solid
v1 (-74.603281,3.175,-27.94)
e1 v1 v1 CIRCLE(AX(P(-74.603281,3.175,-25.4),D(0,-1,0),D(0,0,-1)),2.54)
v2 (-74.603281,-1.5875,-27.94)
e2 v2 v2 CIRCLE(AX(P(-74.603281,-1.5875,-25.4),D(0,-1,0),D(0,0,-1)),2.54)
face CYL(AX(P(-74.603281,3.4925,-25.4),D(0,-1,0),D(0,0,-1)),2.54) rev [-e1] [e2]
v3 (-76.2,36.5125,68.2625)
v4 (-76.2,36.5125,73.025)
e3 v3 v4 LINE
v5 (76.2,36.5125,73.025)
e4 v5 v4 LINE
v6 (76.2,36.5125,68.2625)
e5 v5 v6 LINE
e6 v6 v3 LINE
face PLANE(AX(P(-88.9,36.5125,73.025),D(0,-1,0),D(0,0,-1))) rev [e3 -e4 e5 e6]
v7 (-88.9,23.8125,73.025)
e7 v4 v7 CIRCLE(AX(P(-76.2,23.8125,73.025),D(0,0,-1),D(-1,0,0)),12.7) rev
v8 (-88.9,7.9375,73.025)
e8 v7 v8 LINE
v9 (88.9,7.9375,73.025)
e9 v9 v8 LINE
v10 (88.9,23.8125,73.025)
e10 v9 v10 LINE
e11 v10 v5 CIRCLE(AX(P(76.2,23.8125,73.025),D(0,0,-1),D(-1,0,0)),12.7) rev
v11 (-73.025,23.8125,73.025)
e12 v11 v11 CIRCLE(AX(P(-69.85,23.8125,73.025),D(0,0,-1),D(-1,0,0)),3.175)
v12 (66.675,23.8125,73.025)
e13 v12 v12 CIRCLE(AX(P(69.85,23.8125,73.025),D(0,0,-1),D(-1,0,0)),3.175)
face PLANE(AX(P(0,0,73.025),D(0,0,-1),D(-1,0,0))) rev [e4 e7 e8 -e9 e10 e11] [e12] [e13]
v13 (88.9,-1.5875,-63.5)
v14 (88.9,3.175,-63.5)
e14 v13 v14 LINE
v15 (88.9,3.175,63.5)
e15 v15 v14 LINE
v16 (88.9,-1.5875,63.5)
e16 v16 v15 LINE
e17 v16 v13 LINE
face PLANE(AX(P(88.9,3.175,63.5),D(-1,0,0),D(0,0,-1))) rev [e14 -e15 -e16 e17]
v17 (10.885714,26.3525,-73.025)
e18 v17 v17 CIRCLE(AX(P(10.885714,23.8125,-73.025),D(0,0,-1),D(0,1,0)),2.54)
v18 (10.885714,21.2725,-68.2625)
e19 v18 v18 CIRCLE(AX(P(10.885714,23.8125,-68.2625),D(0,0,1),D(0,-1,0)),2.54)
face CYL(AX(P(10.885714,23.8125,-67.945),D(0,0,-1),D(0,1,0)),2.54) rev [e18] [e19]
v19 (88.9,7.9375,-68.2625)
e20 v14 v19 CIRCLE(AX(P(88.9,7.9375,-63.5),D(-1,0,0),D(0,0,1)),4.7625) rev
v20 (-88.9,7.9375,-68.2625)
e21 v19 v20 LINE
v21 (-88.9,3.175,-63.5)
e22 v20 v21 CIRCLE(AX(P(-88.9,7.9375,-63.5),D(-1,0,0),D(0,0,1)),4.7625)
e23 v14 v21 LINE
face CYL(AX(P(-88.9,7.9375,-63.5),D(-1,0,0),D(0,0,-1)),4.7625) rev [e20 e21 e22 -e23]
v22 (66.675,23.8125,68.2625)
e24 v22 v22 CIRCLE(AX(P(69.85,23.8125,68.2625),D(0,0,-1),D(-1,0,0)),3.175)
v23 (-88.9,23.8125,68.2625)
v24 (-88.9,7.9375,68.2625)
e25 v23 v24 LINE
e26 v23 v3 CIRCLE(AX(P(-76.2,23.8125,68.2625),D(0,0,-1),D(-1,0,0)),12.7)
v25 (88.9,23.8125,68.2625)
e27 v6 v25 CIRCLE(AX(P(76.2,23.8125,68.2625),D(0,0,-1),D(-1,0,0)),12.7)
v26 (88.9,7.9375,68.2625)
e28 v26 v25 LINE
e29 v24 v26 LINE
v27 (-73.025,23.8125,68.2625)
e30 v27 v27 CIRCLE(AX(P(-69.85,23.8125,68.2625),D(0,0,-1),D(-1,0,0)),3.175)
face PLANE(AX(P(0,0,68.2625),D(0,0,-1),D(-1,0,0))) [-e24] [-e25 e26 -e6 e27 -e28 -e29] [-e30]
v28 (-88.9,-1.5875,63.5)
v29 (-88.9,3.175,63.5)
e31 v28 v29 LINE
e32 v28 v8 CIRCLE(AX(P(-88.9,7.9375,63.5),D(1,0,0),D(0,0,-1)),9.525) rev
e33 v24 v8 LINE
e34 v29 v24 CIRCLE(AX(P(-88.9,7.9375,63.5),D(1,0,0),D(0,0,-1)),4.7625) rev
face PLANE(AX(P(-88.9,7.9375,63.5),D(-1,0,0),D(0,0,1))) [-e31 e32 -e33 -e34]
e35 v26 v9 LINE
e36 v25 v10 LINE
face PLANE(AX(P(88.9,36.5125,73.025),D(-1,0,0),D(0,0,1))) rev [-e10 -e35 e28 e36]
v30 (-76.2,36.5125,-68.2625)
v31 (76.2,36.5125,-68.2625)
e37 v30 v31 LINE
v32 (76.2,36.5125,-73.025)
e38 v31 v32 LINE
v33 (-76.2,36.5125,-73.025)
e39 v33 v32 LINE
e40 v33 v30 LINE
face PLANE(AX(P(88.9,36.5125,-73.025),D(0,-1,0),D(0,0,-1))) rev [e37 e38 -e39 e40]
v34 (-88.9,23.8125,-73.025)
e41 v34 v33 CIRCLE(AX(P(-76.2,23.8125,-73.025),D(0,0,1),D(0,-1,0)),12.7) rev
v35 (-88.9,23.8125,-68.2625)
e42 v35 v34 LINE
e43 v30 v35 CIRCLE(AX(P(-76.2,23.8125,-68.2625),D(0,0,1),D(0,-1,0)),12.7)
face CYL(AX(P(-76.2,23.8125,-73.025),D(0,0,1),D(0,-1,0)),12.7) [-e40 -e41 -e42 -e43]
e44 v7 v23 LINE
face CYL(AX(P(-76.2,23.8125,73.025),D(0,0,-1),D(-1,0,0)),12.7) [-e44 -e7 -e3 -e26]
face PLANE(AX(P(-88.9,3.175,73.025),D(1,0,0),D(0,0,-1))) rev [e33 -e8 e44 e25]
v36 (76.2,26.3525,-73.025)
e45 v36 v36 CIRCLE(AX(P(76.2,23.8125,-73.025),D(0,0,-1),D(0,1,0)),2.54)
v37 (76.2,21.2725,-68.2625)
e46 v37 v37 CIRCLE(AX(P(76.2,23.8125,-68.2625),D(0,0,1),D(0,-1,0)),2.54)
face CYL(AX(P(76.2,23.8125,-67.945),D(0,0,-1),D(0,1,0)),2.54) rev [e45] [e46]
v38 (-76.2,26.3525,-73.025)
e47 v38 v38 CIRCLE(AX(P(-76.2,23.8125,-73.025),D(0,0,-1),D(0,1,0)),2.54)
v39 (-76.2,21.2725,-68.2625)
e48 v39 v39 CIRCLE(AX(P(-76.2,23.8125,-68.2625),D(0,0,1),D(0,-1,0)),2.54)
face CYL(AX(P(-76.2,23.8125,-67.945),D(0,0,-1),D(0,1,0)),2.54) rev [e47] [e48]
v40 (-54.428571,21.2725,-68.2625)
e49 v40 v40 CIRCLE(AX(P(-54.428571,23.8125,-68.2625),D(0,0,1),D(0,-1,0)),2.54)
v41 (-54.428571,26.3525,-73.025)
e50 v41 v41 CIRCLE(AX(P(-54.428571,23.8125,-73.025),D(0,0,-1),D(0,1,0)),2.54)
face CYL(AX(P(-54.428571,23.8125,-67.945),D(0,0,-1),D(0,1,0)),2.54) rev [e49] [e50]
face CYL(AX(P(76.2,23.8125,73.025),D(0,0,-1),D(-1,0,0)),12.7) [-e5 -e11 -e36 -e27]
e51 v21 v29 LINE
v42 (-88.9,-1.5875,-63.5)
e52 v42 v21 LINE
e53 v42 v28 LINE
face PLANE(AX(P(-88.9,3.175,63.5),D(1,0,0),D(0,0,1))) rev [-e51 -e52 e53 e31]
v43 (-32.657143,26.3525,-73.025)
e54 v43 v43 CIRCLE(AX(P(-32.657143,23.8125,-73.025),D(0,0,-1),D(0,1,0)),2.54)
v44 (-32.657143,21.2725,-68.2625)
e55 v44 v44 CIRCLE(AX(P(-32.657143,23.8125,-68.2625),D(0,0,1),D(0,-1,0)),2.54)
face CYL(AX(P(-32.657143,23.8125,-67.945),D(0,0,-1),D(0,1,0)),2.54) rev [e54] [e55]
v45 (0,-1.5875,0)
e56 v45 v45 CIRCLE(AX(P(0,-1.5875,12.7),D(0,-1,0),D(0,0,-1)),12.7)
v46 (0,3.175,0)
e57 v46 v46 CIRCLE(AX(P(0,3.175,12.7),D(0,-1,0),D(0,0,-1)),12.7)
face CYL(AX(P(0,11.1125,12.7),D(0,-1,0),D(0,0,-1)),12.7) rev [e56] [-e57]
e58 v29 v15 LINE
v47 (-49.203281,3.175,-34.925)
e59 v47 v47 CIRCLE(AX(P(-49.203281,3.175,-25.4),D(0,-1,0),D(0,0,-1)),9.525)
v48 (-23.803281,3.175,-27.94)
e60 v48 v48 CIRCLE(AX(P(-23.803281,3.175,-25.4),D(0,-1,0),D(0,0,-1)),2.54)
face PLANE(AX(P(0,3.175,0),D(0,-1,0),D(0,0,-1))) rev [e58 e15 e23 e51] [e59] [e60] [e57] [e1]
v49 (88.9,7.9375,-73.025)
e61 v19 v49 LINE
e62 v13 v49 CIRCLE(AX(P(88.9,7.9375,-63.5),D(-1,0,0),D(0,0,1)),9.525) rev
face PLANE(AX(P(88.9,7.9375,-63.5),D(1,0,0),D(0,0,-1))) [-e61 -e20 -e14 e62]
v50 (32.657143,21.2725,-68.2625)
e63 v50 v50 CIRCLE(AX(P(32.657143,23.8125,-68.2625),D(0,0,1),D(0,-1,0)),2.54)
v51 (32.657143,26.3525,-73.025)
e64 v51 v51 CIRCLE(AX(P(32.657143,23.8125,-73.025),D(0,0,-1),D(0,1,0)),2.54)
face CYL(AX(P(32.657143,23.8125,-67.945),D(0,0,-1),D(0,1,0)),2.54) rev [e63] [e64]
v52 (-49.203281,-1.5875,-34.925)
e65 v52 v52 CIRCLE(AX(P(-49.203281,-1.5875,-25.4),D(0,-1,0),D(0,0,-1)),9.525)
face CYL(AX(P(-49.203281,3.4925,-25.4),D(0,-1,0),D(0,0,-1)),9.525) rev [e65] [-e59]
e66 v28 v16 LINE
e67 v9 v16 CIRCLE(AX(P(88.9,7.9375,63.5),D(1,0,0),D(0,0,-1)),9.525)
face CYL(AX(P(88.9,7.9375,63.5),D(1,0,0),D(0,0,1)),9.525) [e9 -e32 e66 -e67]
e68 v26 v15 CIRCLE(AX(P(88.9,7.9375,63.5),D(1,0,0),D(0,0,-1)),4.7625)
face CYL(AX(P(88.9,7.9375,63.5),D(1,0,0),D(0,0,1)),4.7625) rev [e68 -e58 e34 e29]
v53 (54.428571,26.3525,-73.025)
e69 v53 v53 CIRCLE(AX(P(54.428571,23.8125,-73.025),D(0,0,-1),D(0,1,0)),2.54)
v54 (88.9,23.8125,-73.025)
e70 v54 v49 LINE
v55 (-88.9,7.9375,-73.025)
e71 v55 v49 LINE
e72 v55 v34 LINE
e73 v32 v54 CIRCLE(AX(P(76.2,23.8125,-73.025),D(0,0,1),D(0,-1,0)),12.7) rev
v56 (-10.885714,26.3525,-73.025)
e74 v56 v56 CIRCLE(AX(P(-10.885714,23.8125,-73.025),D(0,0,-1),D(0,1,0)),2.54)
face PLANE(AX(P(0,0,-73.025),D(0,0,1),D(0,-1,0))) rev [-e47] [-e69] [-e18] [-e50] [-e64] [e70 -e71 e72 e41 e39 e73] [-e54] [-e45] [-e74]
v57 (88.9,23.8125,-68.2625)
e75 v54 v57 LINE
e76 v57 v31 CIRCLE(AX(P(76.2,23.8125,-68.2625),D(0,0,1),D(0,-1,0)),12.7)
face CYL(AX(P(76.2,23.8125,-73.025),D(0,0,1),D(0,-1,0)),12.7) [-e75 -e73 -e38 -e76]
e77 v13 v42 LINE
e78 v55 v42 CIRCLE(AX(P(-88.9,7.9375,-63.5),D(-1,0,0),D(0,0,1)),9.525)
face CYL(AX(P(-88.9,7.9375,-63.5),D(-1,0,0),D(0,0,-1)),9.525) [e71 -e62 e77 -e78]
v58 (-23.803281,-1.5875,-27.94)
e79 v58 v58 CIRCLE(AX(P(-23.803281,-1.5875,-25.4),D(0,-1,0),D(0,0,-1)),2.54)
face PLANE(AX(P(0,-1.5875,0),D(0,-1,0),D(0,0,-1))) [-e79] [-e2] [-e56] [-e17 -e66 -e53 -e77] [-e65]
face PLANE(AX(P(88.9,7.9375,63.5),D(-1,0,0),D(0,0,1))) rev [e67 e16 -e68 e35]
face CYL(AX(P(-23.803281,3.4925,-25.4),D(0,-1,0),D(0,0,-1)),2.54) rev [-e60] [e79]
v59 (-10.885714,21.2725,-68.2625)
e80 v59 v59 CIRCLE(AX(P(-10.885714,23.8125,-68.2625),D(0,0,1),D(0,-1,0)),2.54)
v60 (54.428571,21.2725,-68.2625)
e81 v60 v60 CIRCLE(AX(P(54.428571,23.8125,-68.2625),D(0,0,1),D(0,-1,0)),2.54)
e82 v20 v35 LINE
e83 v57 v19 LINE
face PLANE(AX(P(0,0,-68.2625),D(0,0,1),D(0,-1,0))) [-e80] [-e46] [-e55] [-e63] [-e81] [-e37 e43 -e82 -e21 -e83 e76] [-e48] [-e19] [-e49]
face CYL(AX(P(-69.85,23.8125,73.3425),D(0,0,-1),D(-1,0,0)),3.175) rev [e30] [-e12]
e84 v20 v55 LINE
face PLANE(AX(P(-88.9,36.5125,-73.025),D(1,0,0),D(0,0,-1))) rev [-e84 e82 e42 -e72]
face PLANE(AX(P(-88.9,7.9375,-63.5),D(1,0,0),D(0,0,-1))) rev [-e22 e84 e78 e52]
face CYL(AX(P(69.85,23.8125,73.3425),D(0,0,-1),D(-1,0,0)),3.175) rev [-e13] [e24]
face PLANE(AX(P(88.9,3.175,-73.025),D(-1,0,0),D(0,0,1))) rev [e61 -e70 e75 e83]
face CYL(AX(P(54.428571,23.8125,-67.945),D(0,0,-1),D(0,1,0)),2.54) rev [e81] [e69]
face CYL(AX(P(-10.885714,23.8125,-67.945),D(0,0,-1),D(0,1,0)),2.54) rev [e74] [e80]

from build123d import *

# Parameters (mm, degrees)
SKETCH1_W                = 177.8
SKETCH1_H                = 127
BOSS_EXTRUDE1_DEPTH      = 3.175
CONVERT_SOLID2_START     = -88.9
CONVERT_SOLID2_OUTLINE_W = 1.5875
CONVERT_SOLID2_OUTLINE_H = 127
CONVERT_SOLID2_DEPTH     = 177.8
EDGE_FLANGE1_DEPTH       = 177.8
EDGE_FLANGE2_DEPTH       = 177.8
SKETCH17_R               = 2.54
CUT_EXTRUDE1_DEPTH       = 5.08
FILLET1_R                = 12.7
SKETCH18_R               = 3.175
CUT_EXTRUDE2_DEPTH       = 5.08
SKETCH19_R               = 12.7
CUT_EXTRUDE3_DEPTH       = 12.7
SKETCH26_R               = 9.525
CUT_EXTRUDE9_DEPTH       = 5.08
SKETCH27_R               = 2.54
CUT_EXTRUDE10_DEPTH      = 5.08
SKETCH28_R               = 2.54
CUT_EXTRUDE11_DEPTH      = 5.08


# Read off the part's stored shape, not the designer's step: Convert-Solid2
# Sheet-metal steps are written as plain solids
with BuildPart() as part:
    # Sketch1 → Boss-Extrude1 (new body)
    with BuildSketch(Plane(origin=(0, 0, 0), x_dir=(1, 0, 0), z_dir=(0, 1, 0))):
        Rectangle(SKETCH1_W, SKETCH1_H)
    extrude(amount=BOSS_EXTRUDE1_DEPTH)

    # Convert-Solid2 outline → Convert-Solid2 (add)
    with BuildSketch(Plane.YZ.offset(CONVERT_SOLID2_START)):
        with Locations((-0.79375, 0)):
            Rectangle(CONVERT_SOLID2_OUTLINE_W, CONVERT_SOLID2_OUTLINE_H)
    extrude(amount=CONVERT_SOLID2_DEPTH)

    # Edge-Flange1 section (across the edge) → Edge-Flange1 (add)
    with BuildSketch(Plane(origin=(88.9, 3.175, -68.2625), x_dir=(0, 0, 1), z_dir=(-1, 0, 0))):
        with BuildLine():
            Line((-4.7625, 4.7625), (-4.7625, 33.3375))
            Line((-4.7625, 33.3375), (0, 33.3375))
            Line((0, 33.3375), (0, 4.7625))
            ThreePointArc((0, 4.7625), (1.394903955, 1.394903955), (4.7625, 0))
            Line((4.7625, 0), (4.7625, -4.7625))
            ThreePointArc((4.7625, -4.7625), (-1.972692091, -1.972692091), (-4.7625, 4.7625))
        make_face()
    extrude(amount=EDGE_FLANGE1_DEPTH)

    # Edge-Flange2 section (across the edge) → Edge-Flange2 (add)
    with BuildSketch(Plane(origin=(-88.9, 3.175, 68.2625), x_dir=(0, 0, -1), z_dir=(1, 0, 0))):
        with BuildLine():
            Line((-4.7625, 4.7625), (-4.7625, 33.3375))
            Line((-4.7625, 33.3375), (0, 33.3375))
            Line((0, 33.3375), (0, 4.7625))
            ThreePointArc((0, 4.7625), (1.394903955, 1.394903955), (4.7625, 0))
            Line((4.7625, 0), (4.7625, -4.7625))
            ThreePointArc((4.7625, -4.7625), (-1.972692091, -1.972692091), (-4.7625, 4.7625))
        make_face()
    extrude(amount=EDGE_FLANGE2_DEPTH)

    # Sketch17 → Cut-Extrude1 (cut)
    with BuildSketch(Plane(origin=(0, 0, -73.025), x_dir=(-1, 0, 0), z_dir=(0, 0, -1))):
        with Locations(Location((-76.2, 23.8125, 0), (0, 0, 90))):
            Circle(SKETCH17_R)
        with Locations(Location((-54.428571429, 23.8125, 0), (0, 0, 90))):
            Circle(SKETCH17_R)
        with Locations(Location((-32.657142857, 23.8125, 0), (0, 0, 90))):
            Circle(SKETCH17_R)
        with Locations(Location((-10.885714286, 23.8125, 0), (0, 0, 90))):
            Circle(SKETCH17_R)
        with Locations(Location((10.885714286, 23.8125, 0), (0, 0, 90))):
            Circle(SKETCH17_R)
        with Locations(Location((32.657142857, 23.8125, 0), (0, 0, 90))):
            Circle(SKETCH17_R)
        with Locations(Location((54.428571429, 23.8125, 0), (0, 0, 90))):
            Circle(SKETCH17_R)
        with Locations(Location((76.2, 23.8125, 0), (0, 0, 90))):
            Circle(SKETCH17_R)
    extrude(amount=-CUT_EXTRUDE1_DEPTH, mode=Mode.SUBTRACT)

    # Fillet1
    fillet1_edges = [part.edges().sort_by_distance(p)[0] for p in [
        (88.9, 36.5125, -70.64375),
        (-88.9, 36.5125, -70.64375),
        (-88.9, 36.5125, 70.64375),
        (88.9, 36.5125, 70.64375),
    ]]
    fillet(fillet1_edges, radius=FILLET1_R)

    # Sketch18 → Cut-Extrude2 (cut)
    with BuildSketch(Plane(origin=(0, 0, 68.2625), x_dir=(-1, 0, 0), z_dir=(0, 0, -1))):
        with Locations((69.85, 23.8125)):
            Circle(SKETCH18_R)
        with Locations((-69.85, 23.8125)):
            Circle(SKETCH18_R)
    extrude(amount=-CUT_EXTRUDE2_DEPTH, mode=Mode.SUBTRACT)

    # Sketch19 → Cut-Extrude3 (cut)
    with BuildSketch(Plane(origin=(0, -1.5875, 0), x_dir=(-1, 0, 0), z_dir=(0, -1, 0))):
        with Locations(Location((0, -12.7, 0), (0, 0, 90))):
            Circle(SKETCH19_R)
    extrude(amount=-CUT_EXTRUDE3_DEPTH, mode=Mode.SUBTRACT)

    # Sketch26 → Cut-Extrude9 (cut)
    with BuildSketch(Plane(origin=(0, -1.5875, 0), x_dir=(-1, 0, 0), z_dir=(0, -1, 0))):
        with Locations(Location((49.203281395, 25.4, 0), (0, 0, 90))):
            Circle(SKETCH26_R)
    extrude(amount=-CUT_EXTRUDE9_DEPTH, mode=Mode.SUBTRACT)

    # Sketch27 → Cut-Extrude10 (cut)
    with BuildSketch(Plane.XZ.offset(1.5875)):
        with Locations(Location((-23.803281395, -25.4, 0), (0, 0, 270))):
            Circle(SKETCH27_R)
    extrude(amount=-CUT_EXTRUDE10_DEPTH, mode=Mode.SUBTRACT)

    # Sketch28 → Cut-Extrude11 (cut)
    with BuildSketch(Plane(origin=(0, -1.5875, 0), x_dir=(-1, 0, 0), z_dir=(0, -1, 0))):
        with Locations(Location((74.603281395, 25.4, 0), (0, 0, 90))):
            Circle(SKETCH28_R)
    extrude(amount=-CUT_EXTRUDE11_DEPTH, mode=Mode.SUBTRACT)


solid = part.part
